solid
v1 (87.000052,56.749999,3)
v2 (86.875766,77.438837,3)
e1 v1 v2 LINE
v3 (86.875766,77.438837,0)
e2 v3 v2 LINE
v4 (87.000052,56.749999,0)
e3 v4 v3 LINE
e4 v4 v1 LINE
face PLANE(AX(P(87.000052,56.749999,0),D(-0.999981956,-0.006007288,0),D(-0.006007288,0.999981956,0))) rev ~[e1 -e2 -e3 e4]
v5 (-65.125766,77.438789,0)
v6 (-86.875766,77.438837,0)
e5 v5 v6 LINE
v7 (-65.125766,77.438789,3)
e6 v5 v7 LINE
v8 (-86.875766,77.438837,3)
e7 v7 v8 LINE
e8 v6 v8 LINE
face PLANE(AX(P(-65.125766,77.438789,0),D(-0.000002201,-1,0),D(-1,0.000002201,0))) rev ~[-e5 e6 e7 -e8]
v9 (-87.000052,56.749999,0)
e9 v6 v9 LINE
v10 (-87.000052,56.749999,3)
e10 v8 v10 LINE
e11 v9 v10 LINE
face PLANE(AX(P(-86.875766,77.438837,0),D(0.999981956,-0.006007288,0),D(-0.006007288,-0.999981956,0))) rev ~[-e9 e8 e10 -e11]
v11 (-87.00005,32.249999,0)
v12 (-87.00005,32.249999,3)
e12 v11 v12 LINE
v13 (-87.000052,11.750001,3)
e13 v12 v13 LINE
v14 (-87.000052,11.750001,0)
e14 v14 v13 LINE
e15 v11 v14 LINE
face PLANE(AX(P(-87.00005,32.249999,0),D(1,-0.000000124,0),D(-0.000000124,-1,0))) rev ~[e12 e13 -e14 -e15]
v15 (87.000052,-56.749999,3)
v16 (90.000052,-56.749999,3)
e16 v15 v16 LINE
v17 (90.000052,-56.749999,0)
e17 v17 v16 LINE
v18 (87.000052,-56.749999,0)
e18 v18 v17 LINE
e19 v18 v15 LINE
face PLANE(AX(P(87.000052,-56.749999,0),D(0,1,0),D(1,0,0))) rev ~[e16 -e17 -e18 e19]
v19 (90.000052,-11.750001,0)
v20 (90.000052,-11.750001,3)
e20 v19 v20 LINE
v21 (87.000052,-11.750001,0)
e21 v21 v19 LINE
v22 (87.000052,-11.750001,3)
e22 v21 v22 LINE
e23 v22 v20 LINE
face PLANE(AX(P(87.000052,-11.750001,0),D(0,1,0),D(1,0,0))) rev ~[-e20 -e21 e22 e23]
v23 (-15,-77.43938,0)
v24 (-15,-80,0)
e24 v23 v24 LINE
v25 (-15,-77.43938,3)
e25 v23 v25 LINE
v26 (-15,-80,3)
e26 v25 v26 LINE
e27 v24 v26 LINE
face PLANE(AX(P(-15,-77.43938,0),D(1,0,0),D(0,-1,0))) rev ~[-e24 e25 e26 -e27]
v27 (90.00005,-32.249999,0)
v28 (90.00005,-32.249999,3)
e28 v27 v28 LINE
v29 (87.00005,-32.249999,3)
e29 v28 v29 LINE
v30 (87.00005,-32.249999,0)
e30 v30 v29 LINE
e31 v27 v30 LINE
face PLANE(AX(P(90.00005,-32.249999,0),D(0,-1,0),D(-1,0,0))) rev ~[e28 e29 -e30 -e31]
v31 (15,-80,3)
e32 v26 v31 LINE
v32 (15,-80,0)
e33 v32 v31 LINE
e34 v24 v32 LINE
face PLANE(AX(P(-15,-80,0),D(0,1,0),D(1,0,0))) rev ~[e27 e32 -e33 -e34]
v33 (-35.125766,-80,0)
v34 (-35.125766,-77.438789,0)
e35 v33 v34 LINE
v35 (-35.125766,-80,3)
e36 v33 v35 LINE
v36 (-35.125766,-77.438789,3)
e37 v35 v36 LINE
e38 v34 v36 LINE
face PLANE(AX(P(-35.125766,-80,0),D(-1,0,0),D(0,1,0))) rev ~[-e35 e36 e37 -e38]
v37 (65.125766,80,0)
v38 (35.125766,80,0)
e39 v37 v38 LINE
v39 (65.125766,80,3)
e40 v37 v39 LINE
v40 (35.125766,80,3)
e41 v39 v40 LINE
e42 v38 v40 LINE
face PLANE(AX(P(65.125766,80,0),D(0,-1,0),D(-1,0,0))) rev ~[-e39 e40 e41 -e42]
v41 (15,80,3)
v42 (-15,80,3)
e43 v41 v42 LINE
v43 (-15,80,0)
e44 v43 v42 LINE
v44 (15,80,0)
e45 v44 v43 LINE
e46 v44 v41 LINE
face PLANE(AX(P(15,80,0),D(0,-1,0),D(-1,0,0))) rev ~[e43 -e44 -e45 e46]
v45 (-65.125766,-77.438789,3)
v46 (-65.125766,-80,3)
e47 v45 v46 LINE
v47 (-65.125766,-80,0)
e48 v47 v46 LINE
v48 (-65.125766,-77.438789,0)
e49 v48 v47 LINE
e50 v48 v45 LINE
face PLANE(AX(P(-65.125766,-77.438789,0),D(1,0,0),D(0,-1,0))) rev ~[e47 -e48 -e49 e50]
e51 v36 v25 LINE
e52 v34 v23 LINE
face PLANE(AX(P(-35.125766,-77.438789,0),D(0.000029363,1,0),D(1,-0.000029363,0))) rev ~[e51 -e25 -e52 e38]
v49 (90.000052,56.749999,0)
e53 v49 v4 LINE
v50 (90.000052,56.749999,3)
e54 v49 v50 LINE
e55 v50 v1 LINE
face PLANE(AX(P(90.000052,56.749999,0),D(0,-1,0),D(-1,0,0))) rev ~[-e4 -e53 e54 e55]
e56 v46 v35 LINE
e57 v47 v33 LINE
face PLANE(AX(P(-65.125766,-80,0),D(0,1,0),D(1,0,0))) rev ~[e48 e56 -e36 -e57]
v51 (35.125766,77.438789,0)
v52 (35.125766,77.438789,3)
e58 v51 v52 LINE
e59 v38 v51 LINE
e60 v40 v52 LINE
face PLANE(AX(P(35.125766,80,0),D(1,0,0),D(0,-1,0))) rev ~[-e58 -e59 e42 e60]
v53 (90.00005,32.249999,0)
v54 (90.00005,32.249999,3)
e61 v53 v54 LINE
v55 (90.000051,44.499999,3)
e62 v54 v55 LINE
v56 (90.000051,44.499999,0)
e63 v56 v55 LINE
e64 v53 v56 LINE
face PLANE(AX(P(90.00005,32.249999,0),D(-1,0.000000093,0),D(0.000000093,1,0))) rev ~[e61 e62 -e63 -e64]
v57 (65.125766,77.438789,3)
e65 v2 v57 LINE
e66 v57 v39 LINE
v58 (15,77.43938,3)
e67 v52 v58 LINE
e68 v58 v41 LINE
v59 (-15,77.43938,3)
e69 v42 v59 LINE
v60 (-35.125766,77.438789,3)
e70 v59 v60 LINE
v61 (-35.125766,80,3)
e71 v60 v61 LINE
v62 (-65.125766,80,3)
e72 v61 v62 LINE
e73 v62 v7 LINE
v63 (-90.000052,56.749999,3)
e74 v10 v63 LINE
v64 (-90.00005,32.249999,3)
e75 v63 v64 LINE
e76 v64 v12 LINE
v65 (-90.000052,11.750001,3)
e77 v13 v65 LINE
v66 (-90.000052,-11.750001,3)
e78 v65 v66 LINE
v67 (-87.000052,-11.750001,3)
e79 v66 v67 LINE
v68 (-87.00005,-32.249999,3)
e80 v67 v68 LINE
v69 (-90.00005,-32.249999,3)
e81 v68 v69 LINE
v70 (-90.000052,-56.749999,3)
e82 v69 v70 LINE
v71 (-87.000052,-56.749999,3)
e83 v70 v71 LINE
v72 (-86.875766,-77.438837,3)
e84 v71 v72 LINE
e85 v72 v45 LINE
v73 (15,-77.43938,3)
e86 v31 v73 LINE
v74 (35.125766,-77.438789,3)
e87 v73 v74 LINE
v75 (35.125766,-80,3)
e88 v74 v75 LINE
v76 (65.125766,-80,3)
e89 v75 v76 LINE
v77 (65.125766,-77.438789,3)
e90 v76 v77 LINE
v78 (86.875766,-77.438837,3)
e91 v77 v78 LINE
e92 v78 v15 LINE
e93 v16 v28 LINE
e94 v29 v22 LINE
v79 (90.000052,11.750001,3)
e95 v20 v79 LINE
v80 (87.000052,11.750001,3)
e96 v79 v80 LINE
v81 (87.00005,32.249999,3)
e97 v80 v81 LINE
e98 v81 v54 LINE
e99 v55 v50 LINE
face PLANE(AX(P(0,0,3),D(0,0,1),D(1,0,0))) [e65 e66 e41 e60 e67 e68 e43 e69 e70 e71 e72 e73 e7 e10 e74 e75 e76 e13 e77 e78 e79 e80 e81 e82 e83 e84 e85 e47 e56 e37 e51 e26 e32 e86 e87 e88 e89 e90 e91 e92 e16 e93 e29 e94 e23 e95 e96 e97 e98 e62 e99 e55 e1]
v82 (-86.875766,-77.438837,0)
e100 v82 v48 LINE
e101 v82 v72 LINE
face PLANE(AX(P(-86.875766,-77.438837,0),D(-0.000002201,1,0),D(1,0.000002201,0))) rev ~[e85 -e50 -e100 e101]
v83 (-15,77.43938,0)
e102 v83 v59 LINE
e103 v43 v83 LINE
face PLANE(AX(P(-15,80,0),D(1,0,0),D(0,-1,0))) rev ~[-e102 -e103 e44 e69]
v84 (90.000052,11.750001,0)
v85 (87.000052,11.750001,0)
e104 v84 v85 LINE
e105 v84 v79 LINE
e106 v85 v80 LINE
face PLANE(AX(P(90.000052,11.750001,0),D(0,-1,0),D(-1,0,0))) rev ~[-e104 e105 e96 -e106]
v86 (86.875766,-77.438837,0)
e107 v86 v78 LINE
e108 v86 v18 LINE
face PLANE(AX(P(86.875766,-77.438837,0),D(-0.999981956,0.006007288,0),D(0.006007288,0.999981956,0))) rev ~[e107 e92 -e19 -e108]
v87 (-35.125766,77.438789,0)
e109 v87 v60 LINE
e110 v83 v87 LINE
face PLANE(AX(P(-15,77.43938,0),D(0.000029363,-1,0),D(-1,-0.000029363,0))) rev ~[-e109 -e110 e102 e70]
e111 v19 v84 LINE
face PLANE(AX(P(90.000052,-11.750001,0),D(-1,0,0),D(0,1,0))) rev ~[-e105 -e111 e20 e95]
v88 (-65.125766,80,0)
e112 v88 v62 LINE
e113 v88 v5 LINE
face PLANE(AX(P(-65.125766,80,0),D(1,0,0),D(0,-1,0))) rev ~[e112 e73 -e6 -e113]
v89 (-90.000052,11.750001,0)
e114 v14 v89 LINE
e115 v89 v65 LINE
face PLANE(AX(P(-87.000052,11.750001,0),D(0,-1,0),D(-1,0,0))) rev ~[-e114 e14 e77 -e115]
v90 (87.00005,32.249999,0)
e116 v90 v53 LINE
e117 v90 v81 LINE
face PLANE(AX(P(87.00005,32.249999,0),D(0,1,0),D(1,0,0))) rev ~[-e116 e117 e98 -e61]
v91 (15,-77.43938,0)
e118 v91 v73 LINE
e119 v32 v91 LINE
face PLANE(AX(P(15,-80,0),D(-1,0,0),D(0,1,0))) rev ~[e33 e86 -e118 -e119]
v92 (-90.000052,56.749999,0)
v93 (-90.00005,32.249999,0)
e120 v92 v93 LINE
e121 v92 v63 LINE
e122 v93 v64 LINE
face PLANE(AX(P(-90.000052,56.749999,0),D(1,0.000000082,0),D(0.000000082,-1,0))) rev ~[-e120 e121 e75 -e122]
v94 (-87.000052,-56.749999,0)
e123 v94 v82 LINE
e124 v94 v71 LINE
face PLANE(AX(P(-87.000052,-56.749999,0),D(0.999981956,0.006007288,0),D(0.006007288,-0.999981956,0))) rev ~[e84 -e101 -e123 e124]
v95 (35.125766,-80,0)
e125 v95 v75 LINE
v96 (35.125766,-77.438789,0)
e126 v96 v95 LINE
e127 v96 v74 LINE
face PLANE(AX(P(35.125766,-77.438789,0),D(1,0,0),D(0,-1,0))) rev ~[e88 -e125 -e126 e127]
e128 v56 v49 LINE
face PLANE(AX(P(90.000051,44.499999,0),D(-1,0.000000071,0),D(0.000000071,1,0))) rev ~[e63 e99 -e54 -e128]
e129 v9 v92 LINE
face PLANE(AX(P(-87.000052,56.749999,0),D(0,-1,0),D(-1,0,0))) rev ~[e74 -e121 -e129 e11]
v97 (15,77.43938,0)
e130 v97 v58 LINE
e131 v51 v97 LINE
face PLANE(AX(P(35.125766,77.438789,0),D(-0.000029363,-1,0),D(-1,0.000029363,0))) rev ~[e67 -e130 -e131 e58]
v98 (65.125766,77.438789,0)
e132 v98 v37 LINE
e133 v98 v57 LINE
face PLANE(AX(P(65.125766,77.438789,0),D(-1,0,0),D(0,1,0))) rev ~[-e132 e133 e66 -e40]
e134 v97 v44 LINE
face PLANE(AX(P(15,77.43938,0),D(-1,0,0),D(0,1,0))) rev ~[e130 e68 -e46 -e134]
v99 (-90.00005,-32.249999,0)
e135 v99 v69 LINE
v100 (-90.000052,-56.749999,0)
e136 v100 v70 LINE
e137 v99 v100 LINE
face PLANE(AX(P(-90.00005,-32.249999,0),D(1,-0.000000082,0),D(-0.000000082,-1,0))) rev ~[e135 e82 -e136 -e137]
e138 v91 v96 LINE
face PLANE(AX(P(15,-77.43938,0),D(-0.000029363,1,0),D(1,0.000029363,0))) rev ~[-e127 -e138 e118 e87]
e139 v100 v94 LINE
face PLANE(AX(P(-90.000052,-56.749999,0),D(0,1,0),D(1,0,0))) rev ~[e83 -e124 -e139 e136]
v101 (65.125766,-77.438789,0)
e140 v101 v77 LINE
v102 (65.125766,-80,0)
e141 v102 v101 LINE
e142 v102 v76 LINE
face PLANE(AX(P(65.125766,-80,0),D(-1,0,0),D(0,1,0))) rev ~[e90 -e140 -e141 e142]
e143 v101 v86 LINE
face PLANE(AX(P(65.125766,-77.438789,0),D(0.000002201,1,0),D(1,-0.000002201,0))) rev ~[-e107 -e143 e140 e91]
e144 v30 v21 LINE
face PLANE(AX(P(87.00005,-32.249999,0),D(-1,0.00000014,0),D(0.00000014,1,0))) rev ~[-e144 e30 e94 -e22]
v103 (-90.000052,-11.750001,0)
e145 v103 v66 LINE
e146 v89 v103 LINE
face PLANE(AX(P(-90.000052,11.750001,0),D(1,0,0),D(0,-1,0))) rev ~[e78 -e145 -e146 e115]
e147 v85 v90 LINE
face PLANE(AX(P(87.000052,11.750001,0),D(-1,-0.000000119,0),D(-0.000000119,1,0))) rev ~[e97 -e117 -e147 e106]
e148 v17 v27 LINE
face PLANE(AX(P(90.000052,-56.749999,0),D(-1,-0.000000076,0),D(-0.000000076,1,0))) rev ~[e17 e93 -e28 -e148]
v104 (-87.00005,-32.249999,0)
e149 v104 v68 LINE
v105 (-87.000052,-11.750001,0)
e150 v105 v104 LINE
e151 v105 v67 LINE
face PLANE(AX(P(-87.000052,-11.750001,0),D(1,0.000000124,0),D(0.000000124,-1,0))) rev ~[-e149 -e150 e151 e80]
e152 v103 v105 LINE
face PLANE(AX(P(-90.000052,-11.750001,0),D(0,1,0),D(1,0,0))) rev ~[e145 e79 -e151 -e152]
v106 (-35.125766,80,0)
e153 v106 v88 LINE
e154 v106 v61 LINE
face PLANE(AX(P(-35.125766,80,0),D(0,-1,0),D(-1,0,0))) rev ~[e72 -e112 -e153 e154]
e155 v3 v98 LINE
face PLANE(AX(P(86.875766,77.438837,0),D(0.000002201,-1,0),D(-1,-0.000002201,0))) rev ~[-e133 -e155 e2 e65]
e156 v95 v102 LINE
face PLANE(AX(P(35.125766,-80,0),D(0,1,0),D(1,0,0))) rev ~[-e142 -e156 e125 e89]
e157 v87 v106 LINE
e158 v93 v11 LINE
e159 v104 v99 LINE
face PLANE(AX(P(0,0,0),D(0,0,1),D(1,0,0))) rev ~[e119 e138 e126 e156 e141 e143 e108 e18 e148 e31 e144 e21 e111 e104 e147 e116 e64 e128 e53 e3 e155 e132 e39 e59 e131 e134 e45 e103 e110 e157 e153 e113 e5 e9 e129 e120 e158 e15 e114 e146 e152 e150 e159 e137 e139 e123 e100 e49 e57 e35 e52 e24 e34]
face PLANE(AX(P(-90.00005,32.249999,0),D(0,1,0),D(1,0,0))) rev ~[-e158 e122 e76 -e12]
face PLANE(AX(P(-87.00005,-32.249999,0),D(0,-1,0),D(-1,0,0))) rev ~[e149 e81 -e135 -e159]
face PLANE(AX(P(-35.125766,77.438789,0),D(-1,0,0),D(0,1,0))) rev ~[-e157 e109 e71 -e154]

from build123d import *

# Parameters (mm, degrees)
F1_DEPTH = 3


# Not quite as in the source:
# - ends of sketch curves that miss each other by under 0.0002 mm in the source are joined


with BuildPart() as f1:
    # F0 (on Top) → F1 (new body)
    with BuildSketch(Plane.XY):
        Polygon((90.0000515607, 56.7499991818), (87.0000515607, 56.7499991818), (86.8757655059, 77.438837362), (65.1257655059, 77.4387894966), (65.1257655059, 80), (35.1257655059, 80), (35.1257655059, 77.4387894966), (15, 77.4393804423), (15, 80), (-15, 80), (-15, 77.4393804423), (-35.1257655059, 77.4387894966), (-35.1257655059, 80), (-65.1257655059, 80), (-65.1257655059, 77.4387894966), (-86.8757655059, 77.438837362), (-87.0000515607, 56.7499991818), (-90.0000515607, 56.7499991818), (-90.0000505592, 44.4999991818), (-90.0000495577, 32.2499991818), (-87.0000498081, 32.2499991818), (-87.0000523425, 11.7500014042), (-90.0000520921, 11.7500014042), (-90.0000520921, -11.7500014042), (-87.0000523425, -11.7500014042), (-87.0000498081, -32.2499991818), (-90.0000495577, -32.2499991818), (-90.0000515607, -56.7499991818), (-87.0000515607, -56.7499991818), (-86.8757655059, -77.438837362), (-65.1257655059, -77.4387894966), (-65.1257655059, -80), (-35.1257655059, -80), (-35.1257655059, -77.4387894966), (-15, -77.4393804423), (-15, -80), (15, -80), (15, -77.4393804423), (35.1257655059, -77.4387894966), (35.1257655059, -80), (65.1257655059, -80), (65.1257655059, -77.4387894966), (86.8757655059, -77.438837362), (87.0000515607, -56.7499991818), (90.0000515607, -56.7499991818), (90.0000496925, -32.2499991818), (87.0000495577, -32.2499991818), (87.0000524286, -11.7500014042), (90.0000520921, -11.7500014042), (90.0000520921, 11.7500014042), (87.0000523425, 11.7500014042), (87.0000498943, 32.2499991818), (90.0000495577, 32.2499991818), (90.000050694, 44.4999991818), align=None)
    extrude(amount=F1_DEPTH)


solid = f1.part
